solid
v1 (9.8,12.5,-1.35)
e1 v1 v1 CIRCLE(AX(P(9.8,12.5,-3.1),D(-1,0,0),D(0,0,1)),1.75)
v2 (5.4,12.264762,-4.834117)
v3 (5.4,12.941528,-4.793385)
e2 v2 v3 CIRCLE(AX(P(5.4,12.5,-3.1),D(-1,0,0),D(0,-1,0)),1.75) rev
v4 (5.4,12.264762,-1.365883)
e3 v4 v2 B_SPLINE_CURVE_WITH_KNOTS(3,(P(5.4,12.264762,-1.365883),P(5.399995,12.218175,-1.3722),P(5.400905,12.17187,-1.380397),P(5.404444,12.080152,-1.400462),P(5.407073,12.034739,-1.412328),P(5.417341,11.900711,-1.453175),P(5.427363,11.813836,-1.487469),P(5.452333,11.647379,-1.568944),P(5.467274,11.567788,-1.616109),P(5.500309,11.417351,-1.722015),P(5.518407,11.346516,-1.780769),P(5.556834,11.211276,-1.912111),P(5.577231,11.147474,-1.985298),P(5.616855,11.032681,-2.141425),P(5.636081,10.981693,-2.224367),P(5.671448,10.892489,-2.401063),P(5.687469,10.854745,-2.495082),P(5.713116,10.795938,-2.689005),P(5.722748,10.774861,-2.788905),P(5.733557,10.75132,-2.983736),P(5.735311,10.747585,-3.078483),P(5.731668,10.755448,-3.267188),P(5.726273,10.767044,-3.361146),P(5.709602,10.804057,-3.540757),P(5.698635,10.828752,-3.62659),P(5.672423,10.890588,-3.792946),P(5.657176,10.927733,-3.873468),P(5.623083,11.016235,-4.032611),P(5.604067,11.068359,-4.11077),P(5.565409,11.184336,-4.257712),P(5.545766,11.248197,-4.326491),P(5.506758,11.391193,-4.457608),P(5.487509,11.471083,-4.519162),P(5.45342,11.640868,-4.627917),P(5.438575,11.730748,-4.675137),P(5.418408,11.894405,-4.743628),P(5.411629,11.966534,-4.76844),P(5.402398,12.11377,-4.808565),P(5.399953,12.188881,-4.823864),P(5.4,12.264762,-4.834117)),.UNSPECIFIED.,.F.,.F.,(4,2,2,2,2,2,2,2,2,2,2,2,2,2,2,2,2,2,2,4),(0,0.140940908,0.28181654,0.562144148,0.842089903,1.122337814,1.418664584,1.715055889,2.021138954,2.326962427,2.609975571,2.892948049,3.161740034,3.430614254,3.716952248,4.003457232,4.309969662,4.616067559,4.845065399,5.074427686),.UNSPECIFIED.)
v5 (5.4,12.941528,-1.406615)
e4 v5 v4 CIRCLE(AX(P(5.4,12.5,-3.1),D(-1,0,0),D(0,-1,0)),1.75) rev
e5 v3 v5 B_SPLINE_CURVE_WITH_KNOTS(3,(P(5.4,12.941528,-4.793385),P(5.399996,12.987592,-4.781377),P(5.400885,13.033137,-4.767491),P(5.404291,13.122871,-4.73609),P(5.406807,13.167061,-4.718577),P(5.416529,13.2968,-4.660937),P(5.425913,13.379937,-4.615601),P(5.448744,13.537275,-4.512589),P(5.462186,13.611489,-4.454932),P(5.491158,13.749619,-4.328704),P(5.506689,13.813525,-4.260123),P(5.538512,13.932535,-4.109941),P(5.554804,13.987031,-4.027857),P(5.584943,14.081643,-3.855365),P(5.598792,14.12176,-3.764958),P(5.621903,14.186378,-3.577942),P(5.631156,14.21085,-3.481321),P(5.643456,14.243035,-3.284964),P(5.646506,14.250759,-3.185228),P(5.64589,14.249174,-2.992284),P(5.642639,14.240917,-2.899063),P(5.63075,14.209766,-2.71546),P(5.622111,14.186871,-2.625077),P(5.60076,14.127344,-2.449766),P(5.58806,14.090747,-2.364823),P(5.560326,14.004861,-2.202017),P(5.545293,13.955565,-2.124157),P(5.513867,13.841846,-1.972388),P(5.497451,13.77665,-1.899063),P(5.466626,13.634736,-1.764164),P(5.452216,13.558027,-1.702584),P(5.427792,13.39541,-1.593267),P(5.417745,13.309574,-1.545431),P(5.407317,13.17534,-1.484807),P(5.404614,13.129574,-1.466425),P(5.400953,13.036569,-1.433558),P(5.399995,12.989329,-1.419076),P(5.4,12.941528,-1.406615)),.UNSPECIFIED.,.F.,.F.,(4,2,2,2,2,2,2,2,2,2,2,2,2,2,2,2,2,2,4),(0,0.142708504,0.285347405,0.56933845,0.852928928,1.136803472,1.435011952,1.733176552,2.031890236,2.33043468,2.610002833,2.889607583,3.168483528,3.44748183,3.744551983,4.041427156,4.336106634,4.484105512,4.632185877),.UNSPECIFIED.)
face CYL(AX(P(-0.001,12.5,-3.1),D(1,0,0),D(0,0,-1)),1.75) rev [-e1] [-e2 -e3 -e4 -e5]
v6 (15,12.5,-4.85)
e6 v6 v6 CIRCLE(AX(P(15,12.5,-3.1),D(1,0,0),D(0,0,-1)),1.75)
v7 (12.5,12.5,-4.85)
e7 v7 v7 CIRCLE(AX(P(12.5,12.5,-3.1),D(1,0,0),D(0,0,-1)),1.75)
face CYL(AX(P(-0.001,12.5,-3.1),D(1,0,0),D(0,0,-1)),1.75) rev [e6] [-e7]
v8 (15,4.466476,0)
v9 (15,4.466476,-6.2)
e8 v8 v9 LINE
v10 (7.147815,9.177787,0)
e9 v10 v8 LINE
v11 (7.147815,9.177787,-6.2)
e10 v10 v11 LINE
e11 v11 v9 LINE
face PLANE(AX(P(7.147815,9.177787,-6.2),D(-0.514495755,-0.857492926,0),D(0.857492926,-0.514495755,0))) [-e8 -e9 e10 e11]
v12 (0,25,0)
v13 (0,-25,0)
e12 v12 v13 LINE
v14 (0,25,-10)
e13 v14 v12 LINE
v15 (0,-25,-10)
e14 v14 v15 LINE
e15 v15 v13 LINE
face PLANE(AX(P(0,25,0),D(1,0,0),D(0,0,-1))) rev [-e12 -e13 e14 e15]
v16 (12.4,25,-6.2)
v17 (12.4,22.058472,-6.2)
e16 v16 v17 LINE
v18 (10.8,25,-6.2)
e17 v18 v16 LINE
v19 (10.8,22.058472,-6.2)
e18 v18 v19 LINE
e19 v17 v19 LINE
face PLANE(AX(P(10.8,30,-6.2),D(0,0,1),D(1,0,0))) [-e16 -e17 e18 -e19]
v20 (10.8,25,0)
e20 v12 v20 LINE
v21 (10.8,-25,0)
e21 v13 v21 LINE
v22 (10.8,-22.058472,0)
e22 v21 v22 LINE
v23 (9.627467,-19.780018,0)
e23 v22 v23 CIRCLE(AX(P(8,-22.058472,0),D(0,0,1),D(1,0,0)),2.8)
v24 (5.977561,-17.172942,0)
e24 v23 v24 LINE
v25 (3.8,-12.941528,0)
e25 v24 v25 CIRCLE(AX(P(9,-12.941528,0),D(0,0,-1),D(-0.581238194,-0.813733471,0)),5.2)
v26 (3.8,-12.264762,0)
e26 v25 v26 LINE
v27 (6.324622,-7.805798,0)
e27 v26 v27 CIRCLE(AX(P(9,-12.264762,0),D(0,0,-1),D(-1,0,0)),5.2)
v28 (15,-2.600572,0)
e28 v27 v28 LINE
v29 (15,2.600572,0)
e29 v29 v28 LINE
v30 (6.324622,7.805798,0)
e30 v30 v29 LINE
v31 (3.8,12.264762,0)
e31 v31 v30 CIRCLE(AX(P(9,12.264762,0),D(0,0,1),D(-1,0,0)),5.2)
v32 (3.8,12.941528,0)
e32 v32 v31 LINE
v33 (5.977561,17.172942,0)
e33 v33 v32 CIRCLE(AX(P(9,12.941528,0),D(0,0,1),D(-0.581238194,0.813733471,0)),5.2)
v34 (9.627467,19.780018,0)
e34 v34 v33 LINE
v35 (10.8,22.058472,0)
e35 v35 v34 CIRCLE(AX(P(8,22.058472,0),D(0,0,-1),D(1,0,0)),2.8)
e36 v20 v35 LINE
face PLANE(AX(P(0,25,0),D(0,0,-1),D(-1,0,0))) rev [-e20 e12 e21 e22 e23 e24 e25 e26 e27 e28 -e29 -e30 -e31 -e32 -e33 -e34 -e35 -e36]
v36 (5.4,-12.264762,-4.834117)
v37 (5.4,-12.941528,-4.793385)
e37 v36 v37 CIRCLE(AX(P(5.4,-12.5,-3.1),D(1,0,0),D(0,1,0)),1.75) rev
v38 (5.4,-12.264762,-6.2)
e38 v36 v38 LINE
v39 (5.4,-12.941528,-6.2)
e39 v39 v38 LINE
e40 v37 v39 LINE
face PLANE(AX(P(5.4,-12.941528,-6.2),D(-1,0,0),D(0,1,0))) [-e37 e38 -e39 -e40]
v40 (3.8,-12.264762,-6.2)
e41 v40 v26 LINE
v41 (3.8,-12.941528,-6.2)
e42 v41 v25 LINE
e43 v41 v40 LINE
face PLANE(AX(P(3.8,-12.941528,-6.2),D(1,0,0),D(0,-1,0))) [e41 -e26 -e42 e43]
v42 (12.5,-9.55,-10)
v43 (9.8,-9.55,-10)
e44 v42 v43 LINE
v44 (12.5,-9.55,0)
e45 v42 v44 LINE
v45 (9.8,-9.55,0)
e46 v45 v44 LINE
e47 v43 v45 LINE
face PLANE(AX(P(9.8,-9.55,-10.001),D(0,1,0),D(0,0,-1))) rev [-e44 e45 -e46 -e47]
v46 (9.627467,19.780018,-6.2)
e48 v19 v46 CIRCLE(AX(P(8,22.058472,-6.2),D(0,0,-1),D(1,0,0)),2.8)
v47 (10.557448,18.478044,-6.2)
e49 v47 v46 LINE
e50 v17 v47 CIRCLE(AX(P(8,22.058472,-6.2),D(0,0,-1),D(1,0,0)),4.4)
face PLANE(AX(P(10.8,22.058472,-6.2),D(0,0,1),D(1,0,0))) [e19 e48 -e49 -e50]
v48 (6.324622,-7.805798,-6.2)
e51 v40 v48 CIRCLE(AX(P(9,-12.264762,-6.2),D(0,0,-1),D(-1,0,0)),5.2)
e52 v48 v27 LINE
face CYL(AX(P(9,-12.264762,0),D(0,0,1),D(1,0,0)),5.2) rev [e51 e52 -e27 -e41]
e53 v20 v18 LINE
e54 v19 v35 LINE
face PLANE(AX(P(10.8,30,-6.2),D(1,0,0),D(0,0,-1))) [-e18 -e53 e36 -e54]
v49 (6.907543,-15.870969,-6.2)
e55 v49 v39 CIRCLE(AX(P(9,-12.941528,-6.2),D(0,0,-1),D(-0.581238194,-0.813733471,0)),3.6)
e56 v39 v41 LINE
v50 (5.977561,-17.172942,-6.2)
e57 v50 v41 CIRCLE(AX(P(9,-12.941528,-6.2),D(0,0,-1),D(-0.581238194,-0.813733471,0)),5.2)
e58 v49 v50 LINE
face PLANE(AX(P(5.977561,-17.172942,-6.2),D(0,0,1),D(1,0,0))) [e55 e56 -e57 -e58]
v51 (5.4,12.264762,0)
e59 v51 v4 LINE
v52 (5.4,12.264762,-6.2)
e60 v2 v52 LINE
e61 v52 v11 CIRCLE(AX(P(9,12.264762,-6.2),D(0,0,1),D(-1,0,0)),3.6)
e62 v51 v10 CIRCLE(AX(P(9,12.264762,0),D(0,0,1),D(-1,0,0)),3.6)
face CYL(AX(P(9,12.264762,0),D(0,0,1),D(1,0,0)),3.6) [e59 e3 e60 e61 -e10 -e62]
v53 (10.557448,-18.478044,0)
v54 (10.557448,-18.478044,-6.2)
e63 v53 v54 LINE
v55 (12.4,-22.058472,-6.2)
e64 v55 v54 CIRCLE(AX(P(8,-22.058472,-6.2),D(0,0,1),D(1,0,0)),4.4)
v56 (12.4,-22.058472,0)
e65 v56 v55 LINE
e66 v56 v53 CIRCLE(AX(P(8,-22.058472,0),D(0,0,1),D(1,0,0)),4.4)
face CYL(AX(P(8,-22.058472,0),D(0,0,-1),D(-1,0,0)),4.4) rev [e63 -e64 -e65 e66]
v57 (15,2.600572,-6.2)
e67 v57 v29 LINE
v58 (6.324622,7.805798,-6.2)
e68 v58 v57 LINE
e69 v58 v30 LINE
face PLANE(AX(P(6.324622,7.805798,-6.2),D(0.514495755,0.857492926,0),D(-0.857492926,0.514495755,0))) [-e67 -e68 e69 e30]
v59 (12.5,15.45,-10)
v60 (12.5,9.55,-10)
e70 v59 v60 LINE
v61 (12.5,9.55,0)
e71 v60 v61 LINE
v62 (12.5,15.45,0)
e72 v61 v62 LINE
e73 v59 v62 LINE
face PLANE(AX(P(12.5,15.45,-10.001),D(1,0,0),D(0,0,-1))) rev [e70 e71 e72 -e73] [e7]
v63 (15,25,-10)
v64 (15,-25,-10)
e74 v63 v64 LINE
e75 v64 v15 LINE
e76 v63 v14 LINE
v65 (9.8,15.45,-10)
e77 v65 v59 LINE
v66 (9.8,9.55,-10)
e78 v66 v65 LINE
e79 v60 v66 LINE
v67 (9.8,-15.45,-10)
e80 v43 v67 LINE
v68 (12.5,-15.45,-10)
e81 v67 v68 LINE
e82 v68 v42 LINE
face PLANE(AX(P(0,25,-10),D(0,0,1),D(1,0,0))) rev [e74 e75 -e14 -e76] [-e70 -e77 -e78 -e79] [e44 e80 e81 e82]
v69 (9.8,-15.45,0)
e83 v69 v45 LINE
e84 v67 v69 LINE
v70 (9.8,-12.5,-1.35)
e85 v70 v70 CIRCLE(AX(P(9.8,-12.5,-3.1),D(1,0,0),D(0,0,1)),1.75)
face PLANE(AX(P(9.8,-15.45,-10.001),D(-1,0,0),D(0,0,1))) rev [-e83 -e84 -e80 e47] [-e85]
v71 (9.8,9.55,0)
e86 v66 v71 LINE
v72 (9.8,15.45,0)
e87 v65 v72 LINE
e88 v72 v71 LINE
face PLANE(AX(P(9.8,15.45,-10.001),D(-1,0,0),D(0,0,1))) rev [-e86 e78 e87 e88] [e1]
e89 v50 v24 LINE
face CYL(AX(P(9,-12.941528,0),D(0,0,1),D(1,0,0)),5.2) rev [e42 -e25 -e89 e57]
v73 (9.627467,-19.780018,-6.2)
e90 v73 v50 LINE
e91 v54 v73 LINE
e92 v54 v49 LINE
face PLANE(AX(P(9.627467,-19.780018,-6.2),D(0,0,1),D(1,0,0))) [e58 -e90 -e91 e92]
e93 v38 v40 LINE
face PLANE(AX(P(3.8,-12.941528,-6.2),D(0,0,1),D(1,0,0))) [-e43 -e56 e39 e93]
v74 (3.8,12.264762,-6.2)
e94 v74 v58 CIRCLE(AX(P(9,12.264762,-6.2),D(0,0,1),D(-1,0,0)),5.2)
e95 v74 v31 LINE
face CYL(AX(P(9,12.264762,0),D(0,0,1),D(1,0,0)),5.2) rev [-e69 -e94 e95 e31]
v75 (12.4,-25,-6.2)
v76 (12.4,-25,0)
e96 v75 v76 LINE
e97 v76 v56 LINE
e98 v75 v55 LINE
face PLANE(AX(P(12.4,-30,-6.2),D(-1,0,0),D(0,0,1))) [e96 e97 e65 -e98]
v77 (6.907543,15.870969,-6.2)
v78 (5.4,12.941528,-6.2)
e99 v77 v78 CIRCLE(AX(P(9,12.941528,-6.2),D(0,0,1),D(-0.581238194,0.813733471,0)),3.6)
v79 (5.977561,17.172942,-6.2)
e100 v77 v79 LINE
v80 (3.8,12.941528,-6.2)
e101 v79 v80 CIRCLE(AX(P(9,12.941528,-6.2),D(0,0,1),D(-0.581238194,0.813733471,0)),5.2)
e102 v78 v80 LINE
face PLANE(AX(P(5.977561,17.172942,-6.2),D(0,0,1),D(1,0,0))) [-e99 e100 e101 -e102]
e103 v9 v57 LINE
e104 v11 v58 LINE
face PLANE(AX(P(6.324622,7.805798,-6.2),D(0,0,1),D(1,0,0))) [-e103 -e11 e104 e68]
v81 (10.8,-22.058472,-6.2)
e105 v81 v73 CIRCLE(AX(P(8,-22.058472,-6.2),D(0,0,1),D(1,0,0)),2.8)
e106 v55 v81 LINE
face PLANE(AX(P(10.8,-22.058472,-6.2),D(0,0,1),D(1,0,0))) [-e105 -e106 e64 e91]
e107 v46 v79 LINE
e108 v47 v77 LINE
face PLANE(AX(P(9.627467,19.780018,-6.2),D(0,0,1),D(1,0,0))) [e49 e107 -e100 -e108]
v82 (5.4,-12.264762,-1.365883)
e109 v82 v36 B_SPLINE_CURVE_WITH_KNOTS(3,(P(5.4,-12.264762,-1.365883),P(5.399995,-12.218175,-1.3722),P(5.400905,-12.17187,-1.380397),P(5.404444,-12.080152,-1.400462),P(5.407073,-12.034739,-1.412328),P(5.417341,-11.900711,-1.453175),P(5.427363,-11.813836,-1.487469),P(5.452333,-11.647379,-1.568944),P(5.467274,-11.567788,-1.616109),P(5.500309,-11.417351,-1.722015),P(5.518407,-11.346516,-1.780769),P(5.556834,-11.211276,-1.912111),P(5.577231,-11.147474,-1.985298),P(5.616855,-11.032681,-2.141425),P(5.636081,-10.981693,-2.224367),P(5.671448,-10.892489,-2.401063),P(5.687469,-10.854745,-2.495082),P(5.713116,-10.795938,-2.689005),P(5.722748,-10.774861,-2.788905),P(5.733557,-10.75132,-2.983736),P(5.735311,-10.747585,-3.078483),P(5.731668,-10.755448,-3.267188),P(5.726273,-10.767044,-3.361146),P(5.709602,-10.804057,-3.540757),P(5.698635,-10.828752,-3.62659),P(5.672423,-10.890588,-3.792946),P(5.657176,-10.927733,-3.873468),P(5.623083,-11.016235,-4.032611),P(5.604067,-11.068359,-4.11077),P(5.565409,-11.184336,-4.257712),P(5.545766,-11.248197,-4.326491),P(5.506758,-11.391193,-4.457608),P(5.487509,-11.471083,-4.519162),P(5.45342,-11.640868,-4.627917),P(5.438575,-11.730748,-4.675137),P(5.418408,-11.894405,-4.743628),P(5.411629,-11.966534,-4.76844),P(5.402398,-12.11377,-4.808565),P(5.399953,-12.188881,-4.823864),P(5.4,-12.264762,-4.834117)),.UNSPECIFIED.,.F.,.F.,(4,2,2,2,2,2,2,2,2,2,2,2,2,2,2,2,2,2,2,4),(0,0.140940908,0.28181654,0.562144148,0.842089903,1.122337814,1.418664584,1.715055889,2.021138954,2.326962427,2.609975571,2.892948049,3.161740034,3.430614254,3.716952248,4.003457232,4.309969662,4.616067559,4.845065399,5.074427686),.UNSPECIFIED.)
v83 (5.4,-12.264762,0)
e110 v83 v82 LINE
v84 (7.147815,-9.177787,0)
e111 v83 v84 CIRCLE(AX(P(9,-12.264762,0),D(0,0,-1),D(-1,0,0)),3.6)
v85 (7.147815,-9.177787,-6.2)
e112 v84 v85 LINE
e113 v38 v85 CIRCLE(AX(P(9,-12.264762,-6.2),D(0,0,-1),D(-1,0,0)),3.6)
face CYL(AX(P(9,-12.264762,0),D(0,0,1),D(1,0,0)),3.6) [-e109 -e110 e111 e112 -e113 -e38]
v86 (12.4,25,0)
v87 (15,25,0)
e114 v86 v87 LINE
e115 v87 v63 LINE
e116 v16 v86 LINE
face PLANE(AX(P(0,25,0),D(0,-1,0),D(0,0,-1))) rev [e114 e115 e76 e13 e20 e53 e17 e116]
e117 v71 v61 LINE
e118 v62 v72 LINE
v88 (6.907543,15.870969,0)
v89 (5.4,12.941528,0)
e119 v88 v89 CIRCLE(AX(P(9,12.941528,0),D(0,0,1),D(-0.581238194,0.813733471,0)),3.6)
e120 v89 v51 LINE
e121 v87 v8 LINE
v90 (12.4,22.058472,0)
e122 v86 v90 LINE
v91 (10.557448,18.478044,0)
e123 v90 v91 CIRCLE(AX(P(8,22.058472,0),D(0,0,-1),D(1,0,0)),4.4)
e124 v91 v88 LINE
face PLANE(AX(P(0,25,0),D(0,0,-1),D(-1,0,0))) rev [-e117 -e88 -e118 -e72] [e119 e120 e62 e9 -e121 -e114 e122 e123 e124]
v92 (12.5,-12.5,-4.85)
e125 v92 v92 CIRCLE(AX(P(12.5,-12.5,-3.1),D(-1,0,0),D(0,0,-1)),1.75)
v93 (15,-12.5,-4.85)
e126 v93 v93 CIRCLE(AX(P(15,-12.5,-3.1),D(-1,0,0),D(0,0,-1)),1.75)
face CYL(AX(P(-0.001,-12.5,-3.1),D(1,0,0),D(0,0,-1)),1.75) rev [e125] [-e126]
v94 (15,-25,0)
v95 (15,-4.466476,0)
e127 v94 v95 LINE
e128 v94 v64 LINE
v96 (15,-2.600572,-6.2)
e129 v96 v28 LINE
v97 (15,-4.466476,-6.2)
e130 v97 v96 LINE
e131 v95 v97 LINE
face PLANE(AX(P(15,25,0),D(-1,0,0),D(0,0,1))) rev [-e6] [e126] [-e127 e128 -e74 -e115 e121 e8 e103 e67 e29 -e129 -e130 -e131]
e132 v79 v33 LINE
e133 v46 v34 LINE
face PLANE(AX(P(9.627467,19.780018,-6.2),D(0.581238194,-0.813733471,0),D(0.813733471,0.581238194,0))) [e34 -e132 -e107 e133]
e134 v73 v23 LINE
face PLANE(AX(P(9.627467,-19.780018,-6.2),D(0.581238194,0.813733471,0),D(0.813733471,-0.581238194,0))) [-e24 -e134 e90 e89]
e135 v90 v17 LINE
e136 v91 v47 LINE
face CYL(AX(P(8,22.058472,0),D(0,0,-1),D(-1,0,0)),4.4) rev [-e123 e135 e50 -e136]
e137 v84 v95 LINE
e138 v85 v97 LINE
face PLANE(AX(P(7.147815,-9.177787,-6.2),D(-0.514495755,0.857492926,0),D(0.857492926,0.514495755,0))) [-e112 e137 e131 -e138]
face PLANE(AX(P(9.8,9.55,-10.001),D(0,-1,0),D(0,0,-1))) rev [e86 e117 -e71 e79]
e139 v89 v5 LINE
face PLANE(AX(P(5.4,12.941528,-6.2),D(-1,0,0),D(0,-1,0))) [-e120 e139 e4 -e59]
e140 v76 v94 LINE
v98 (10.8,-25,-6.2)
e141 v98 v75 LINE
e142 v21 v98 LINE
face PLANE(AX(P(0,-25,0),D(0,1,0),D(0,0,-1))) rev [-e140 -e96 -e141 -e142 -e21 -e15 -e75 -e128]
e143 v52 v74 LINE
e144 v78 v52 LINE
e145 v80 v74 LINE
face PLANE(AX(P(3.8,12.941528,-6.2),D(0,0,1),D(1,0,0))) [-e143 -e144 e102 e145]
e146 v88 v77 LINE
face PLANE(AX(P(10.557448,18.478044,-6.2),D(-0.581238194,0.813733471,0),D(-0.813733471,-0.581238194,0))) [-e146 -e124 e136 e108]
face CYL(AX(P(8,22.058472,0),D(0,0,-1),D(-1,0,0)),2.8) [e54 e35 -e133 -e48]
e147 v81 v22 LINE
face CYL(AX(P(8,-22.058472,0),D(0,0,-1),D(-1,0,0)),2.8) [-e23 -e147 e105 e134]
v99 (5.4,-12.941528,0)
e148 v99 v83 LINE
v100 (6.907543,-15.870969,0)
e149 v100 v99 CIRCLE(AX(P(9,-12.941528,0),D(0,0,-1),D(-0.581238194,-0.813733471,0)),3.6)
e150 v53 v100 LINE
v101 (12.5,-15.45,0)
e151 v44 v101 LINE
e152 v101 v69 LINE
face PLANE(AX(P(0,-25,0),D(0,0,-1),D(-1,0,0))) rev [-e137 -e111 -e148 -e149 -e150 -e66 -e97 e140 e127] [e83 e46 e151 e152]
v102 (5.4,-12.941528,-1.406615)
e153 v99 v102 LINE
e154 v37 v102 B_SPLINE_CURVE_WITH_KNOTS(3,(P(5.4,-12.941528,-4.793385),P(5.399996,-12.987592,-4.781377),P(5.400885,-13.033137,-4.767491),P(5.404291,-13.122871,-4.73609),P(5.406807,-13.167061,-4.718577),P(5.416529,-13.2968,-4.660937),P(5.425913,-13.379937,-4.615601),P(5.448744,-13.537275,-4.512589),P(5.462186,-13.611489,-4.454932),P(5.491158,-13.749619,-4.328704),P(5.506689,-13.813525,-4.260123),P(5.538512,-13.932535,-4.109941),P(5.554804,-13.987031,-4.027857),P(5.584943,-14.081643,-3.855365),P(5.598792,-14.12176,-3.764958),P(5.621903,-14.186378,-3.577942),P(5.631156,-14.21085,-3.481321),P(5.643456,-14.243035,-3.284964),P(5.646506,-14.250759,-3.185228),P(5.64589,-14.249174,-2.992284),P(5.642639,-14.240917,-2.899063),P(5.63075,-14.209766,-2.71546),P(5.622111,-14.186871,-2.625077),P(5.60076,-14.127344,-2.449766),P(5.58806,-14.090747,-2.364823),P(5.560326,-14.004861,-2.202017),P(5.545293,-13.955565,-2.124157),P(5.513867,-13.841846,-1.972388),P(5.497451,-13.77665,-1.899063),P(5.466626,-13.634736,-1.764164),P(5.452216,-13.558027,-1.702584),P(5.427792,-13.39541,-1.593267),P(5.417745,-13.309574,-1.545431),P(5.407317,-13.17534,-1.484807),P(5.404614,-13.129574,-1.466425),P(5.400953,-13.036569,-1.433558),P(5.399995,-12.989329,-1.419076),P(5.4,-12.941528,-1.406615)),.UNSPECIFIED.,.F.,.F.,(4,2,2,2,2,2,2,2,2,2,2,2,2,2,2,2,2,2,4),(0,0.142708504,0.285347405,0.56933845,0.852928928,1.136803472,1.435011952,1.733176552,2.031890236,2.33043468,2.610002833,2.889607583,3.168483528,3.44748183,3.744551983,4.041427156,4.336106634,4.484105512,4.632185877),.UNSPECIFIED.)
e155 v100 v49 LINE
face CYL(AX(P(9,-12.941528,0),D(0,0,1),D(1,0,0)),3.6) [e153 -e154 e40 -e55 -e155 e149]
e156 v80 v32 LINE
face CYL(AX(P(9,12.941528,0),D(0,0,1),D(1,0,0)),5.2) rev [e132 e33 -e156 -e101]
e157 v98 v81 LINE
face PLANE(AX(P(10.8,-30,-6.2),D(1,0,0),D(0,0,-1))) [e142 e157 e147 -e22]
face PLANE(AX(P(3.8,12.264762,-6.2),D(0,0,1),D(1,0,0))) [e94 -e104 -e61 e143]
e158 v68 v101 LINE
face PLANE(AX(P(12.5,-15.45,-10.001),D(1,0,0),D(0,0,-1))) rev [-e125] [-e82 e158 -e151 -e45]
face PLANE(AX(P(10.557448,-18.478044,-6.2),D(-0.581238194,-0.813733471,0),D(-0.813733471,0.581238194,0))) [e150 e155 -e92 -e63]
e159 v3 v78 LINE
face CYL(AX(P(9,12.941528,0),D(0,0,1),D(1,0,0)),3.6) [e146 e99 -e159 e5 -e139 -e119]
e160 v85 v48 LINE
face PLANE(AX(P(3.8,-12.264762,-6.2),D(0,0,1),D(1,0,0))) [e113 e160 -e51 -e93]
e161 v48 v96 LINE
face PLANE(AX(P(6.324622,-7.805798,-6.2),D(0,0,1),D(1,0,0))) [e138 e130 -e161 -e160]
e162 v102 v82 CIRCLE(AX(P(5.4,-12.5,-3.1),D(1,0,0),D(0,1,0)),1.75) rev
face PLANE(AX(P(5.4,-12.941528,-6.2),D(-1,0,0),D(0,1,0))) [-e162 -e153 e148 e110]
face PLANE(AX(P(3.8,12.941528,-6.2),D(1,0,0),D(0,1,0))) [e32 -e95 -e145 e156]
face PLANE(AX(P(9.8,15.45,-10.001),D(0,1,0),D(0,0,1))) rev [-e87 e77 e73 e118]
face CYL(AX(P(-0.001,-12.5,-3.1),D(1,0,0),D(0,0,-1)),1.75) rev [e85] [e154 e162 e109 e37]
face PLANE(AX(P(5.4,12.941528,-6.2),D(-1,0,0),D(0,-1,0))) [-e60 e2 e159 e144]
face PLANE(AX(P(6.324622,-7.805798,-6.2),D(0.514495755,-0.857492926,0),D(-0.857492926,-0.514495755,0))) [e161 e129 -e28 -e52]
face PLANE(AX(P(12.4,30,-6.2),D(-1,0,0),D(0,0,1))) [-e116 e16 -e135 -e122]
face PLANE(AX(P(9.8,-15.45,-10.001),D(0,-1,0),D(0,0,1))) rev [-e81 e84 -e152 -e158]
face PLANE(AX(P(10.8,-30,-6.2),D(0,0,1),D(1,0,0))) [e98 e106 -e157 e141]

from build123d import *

# Parameters (mm, degrees)
ESQUISSE1_W                           = 15
ESQUISSE1_H                           = 10
BOSS_EXTRU_1_DEPTH                    = 25
ENL_VEMENT_START                      = -6.2
ENL_VEMENT_DE_MATI_RE_BALAYAGE1_DEPTH = 6.2
ENL_V_MAT_EXTRU_1_REACH               = 32.822
ESQUISSE4_R                           = 1.75
ENL_V_MAT_EXTRU_2_REACH               = 32.822
ESQUISSE5_W                           = 2.7
ESQUISSE5_H                           = 5.9


# Read off the part's stored shape, not the designer's step: Enlèvement de matière-Balayage1
with BuildPart() as part:
    # Esquisse1 → Boss.-Extru.1 (new body)
    with BuildSketch(Plane(origin=(0, 0, 0), x_dir=(1, 0, 0), z_dir=(0, 1, 0))):
        with Locations((7.5, 5)):
            Rectangle(ESQUISSE1_W, ESQUISSE1_H)
    extrude(amount=BOSS_EXTRU_1_DEPTH)

    # Enlèvement de matière-Balayage1 outline → Enlèvement de matière-Balayage1 (cut)
    with BuildSketch(Plane.XY.offset(ENL_VEMENT_START)):
        with BuildLine():
            Line((10.8, 25), (10.8, 22.058471581))
            ThreePointArc((10.8, 22.058471581), (10.4896694, 20.777243155), (9.627466942, 19.780017862))
            Line((9.627466942, 19.780017862), (5.977561393, 17.172942469))
            ThreePointArc((5.977561393, 17.172942469), (4.376328258, 15.320952639), (3.8, 12.941528419))
            Line((3.8, 12.941528419), (3.8, 12.264761516))
            ThreePointArc((3.8, 12.264761516), (4.474960485, 9.702727678), (6.324622072, 7.805798302))
            Line((6.324622072, 7.805798302), (15, 2.600571545))
            Line((15, 2.600571545), (15, 4.466476152))
            Line((15, 4.466476152), (7.14781528, 9.177786983))
            ThreePointArc((7.14781528, 9.177786983), (5.867280336, 10.491045782), (5.4, 12.264761516))
            Line((5.4, 12.264761516), (5.4, 12.941528419))
            ThreePointArc((5.4, 12.941528419), (5.798996486, 14.58882211), (6.907542503, 15.870968915))
            Line((6.907542503, 15.870968915), (10.557448052, 18.478044308))
            ThreePointArc((10.557448052, 18.478044308), (11.912337628, 20.045112625), (12.4, 22.058471581))
            Line((12.4, 22.058471581), (12.4, 25))
            Line((12.4, 25), (10.8, 25))
        make_face()
    extrude(amount=ENL_VEMENT_DE_MATI_RE_BALAYAGE1_DEPTH, mode=Mode.SUBTRACT)

    # Esquisse4 → Enlèv. mat.-Extru.1 (cut, up to next)
    with BuildSketch(Plane(origin=(15, 0, 0), x_dir=(0, 0, -1), z_dir=(1, 0, 0)), mode=Mode.PRIVATE) as enl_v_mat_extru_1_sk1:
        with Locations((3.1, 12.5)):
            Circle(ESQUISSE4_R)
    enl_v_mat_extru_1_tool1 = extrude(enl_v_mat_extru_1_sk1.sketch, amount=-ENL_V_MAT_EXTRU_1_REACH, mode=Mode.PRIVATE) & part.part
    add(enl_v_mat_extru_1_tool1.solids().sort_by_distance((15, 12.5, -3.1))[0], mode=Mode.SUBTRACT)

    # Esquisse5 → Enlèv. mat.-Extru.2 (cut, up to next)
    with BuildSketch(Plane.XY, mode=Mode.PRIVATE) as enl_v_mat_extru_2_sk1:
        with Locations((11.15, 12.5)):
            Rectangle(ESQUISSE5_W, ESQUISSE5_H)
    enl_v_mat_extru_2_tool1 = extrude(enl_v_mat_extru_2_sk1.sketch, amount=-ENL_V_MAT_EXTRU_2_REACH, mode=Mode.PRIVATE) & part.part
    add(enl_v_mat_extru_2_tool1.solids().sort_by_distance((11.15, 12.5, 0))[0], mode=Mode.SUBTRACT)

    # Symétrie1: part across plane


with BuildPart() as part_1:
    add(part.part)
    add(part.part.mirror(Plane(origin=(0, 0, 0), x_dir=(0, 0, 1), z_dir=(0, -1, 0))))


solid = part_1.part
